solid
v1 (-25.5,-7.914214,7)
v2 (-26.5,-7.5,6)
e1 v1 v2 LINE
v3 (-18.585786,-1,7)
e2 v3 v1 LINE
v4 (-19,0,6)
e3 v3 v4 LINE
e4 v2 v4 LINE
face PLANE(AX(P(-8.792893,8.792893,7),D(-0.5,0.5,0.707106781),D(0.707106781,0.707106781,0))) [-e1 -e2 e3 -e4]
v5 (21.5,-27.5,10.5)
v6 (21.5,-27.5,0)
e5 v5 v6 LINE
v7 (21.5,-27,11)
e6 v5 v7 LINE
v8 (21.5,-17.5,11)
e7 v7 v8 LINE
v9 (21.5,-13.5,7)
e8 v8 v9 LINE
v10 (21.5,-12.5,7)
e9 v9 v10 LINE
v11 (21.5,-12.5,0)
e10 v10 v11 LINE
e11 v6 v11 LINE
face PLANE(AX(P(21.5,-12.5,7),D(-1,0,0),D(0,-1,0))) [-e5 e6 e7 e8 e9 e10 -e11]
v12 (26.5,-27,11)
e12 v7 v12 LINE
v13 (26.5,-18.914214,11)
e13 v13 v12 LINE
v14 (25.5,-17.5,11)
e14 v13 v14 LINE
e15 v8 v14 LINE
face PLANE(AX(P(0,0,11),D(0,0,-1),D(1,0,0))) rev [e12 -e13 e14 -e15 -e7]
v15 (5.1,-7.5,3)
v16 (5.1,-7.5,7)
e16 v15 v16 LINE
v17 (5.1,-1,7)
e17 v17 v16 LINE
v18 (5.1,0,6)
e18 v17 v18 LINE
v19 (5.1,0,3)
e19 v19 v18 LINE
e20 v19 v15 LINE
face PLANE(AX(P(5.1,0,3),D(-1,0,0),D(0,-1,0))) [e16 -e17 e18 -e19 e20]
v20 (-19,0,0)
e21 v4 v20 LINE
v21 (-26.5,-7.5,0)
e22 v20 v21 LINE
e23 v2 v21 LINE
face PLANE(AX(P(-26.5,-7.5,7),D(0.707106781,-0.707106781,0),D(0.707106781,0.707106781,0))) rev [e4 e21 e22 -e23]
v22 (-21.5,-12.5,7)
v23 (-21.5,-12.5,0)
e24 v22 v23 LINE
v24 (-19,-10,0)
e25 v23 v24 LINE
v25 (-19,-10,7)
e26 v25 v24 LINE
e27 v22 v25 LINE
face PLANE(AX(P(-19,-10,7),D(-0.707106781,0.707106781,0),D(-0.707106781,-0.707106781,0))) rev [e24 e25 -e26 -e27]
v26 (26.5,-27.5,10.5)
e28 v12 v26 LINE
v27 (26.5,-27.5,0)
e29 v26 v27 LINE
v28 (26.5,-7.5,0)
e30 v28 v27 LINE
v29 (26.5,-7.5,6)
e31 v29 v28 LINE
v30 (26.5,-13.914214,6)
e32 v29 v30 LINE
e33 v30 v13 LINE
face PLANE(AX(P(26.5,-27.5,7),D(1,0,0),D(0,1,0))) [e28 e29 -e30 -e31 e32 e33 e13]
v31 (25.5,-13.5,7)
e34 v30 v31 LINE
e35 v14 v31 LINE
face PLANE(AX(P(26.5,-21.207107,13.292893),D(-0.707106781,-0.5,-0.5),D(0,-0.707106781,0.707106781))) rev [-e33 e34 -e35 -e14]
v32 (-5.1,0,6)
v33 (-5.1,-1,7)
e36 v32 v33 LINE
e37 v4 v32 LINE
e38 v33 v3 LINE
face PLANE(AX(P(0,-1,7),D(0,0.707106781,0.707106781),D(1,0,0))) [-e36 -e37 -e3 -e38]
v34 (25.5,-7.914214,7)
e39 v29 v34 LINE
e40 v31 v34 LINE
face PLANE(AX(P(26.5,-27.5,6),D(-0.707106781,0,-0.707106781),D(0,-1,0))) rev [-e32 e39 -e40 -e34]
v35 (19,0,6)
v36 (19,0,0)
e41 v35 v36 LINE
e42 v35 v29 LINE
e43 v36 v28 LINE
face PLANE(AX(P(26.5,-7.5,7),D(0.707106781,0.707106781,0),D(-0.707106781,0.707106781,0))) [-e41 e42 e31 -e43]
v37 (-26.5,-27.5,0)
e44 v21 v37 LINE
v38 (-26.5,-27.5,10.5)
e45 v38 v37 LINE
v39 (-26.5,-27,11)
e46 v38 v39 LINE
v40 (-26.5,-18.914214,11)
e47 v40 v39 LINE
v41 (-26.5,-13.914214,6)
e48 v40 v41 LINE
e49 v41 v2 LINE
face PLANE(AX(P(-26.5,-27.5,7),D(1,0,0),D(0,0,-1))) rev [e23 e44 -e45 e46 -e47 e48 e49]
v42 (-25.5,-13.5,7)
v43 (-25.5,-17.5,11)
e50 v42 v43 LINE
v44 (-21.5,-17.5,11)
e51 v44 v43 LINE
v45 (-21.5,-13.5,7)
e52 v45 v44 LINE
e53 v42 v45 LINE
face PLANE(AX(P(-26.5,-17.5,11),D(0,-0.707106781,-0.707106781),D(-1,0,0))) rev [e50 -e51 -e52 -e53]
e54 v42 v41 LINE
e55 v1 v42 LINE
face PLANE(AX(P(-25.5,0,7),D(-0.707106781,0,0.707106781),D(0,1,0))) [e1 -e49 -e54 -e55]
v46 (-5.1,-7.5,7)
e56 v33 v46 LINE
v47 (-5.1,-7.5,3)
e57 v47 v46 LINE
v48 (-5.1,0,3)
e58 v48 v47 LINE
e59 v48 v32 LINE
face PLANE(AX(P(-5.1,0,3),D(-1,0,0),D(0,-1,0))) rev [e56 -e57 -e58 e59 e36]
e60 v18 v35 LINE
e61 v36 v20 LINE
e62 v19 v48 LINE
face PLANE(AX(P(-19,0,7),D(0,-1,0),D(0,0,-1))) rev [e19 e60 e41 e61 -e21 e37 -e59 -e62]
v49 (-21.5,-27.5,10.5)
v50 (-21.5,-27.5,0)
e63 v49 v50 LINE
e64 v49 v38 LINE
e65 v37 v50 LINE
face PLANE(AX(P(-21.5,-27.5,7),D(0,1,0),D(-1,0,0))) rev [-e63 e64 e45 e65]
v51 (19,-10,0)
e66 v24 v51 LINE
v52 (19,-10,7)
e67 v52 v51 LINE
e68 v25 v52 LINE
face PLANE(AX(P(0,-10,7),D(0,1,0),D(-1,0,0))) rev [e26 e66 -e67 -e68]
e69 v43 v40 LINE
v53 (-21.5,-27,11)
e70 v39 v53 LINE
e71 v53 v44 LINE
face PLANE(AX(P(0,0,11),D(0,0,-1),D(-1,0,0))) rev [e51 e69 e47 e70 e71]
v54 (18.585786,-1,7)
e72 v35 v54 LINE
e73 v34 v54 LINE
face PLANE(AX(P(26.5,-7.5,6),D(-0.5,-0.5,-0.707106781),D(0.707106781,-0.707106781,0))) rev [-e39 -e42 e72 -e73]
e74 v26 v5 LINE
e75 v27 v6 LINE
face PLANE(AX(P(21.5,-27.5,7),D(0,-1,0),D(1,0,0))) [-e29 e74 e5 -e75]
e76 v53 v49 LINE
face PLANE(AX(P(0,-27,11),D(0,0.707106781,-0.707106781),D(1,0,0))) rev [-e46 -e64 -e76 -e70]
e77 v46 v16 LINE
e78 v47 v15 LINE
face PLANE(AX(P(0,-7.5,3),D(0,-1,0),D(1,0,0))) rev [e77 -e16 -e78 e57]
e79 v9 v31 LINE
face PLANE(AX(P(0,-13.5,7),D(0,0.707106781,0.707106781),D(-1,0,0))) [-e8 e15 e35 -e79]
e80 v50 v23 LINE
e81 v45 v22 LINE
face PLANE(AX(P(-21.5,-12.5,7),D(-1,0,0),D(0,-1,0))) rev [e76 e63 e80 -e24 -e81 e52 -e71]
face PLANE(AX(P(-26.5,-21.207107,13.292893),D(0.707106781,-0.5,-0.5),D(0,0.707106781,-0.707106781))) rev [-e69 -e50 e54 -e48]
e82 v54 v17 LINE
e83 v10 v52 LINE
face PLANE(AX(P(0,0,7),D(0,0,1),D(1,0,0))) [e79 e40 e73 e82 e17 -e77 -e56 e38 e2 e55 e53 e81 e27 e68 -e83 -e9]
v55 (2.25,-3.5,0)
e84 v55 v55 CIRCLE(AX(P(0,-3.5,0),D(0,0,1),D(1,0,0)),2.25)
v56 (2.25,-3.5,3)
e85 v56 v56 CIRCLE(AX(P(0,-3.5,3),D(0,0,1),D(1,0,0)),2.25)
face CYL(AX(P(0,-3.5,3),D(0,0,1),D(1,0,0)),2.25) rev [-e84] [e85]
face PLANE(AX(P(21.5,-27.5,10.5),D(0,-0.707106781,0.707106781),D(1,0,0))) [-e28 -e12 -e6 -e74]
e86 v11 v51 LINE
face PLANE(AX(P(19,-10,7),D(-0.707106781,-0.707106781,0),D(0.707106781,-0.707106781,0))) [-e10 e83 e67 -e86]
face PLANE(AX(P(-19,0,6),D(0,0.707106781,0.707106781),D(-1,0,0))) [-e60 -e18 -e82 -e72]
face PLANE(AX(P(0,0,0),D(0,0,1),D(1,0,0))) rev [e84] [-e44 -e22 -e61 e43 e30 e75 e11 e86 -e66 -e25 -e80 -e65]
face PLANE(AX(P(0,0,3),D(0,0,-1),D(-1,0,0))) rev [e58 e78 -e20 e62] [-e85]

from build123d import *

# Parameters (mm, degrees)
BOSS_EXTRUDE1_DEPTH  = 7
SKETCH6_W            = 5
SKETCH6_H            = 10
BOSS_EXTRUDE2_DEPTH  = 4
SKETCH3_W            = 5.1
SKETCH3_H            = 7.5
CUT_EXTRUDE1_DEPTH   = 4
M4_CLEARANCE_HOLE1_D = 4.5
CHAMFER2_SIZE        = 4
CHAMFER5_SIZE        = 0.5


# Some blends are built 0.0001 mm under size
with BuildPart() as part:
    # Sketch1 → Boss-Extrude1 (new body)
    with BuildSketch(Plane.XY):
        Polygon((0, 0), (0, -10), (-19, -10), (-21.5, -12.5), (-21.5, -27.5), (-26.5, -27.5), (-26.5, -7.5), (-19, 0), align=None)
    boss_extrude1 = extrude(amount=BOSS_EXTRUDE1_DEPTH)

    # Sketch6 → Boss-Extrude2 (add)
    with BuildSketch(Plane.XY.offset(7)):
        with Locations((-24, -22.5)):
            Rectangle(SKETCH6_W, SKETCH6_H)
    boss_extrude2 = extrude(amount=BOSS_EXTRUDE2_DEPTH)

    # Sketch3 → Cut-Extrude1 (cut)
    with BuildSketch(Plane.XY.offset(7)):
        with Locations((-2.55, -3.75)):
            Rectangle(SKETCH3_W, SKETCH3_H)
    cut_extrude1 = extrude(amount=-CUT_EXTRUDE1_DEPTH, mode=Mode.SUBTRACT)

    # Mirror1: Boss-Extrude1, Boss-Extrude2, Cut-Extrude1 across plane
    add(boss_extrude1.mirror(Plane(origin=(0, 0, 7), x_dir=(0, 0, 1), z_dir=(-1, 0, 0))))
    add(boss_extrude2.mirror(Plane(origin=(0, 0, 7), x_dir=(0, 0, 1), z_dir=(-1, 0, 0))))
    add(cut_extrude1.mirror(Plane(origin=(0, 0, 7), x_dir=(0, 0, 1), z_dir=(-1, 0, 0))), mode=Mode.SUBTRACT)

    # M4 Clearance Hole1 (through all)
    with Locations(Plane.XY.offset(3)):
        with Locations((0, -3.5)):
            Hole(M4_CLEARANCE_HOLE1_D / 2)

    # Chamfer2
    chamfer2_edges = [part.edges().sort_by_distance(p)[0] for p in [
        (-24, -17.5, 7),
        (24, -17.5, 7),
    ]]
    chamfer(chamfer2_edges, length=CHAMFER2_SIZE - 0.0001)  # a hair under: the kernel refuses the full size

    # Chamfer4
    # the kernel refuses this chamfer: 1 mm, written as the material it takes off along each edge
    with BuildSketch(Plane(origin=(26.5, -11.68164552, 5.18154552), x_dir=(-0.9996219169112968, 0.019442520806014118, 0.01944252080601436), z_dir=(0, -0.7071067811865476, 0.7071067811865476))) as chamfer4_piece_1_section:
        with BuildLine():
            Line((1.028673195, 0), (-0.056547155, 1.027117794))
            Line((-0.056547155, 1.027117794), (-0.076539593, 1.026567876))
            ThreePointArc((-0.076539593, 1.026567876), (-0.034129227, 0.51339783), (-0.019992438, -0.000549918))
            Line((-0.019992438, -0.000549918), (0.000549918, -0.019992438))
            ThreePointArc((0.000549918, -0.019992438), (0.514497665, -0.00585565), (1.029223113, -0.019992438))
            Line((1.029223113, -0.019992438), (1.028673195, 0))
        make_face()
    chamfer4_piece_1 = extrude(amount=10.800078804, mode=Mode.PRIVATE)
    chamfer4_piece_1 = split(chamfer4_piece_1, bisect_by=Plane(origin=(26.156619069, -15.715277747, 7), z_dir=(0, 0, 1)), keep=Keep.TOP, mode=Mode.PRIVATE)
    add(chamfer4_piece_1, mode=Mode.SUBTRACT)
    with BuildSketch(Plane(origin=(-26.5, -11.68164552, 5.18154552), x_dir=(0.9996219169112968, 0.019442520806013806, 0.019442520806013806), z_dir=(0, -0.7071067811865476, 0.7071067811865476))) as chamfer4_piece_2_section:
        with BuildLine():
            Line((1.028673195, 0), (-0.056547155, -1.027117794))
            Line((-0.056547155, -1.027117794), (-0.076539593, -1.026567876))
            ThreePointArc((-0.076539593, -1.026567876), (-0.034129227, -0.51339783), (-0.019992438, 0.000549918))
            Line((-0.019992438, 0.000549918), (0.000549918, 0.019992438))
            ThreePointArc((0.000549918, 0.019992438), (0.514497665, 0.00585565), (1.029223113, 0.019992438))
            Line((1.029223113, 0.019992438), (1.028673195, 0))
        make_face()
    chamfer4_piece_2 = extrude(amount=10.800078804, mode=Mode.PRIVATE)
    chamfer4_piece_2 = split(chamfer4_piece_2, bisect_by=Plane(origin=(-26.156619069, -15.715277747, 7), z_dir=(0, 0, 1)), keep=Keep.TOP, mode=Mode.PRIVATE)
    add(chamfer4_piece_2, mode=Mode.SUBTRACT)
    with BuildSketch(Plane(origin=(-28.31845448, -9.31845448, 7), x_dir=(0.7068394360706726, -0.7068394360706746, 0.027495876610586528), z_dir=(0.7071067811865485, 0.7071067811865466, 0))) as chamfer4_piece_3:
        with BuildLine():
            Line((1.028673195, 0), (-0.056547155, 1.027117794))
            Line((-0.056547155, 1.027117794), (-0.076539593, 1.026567876))
            ThreePointArc((-0.076539593, 1.026567876), (-0.034129227, 0.51339783), (-0.019992438, -0.000549918))
            Line((-0.019992438, -0.000549918), (0.000549918, -0.019992438))
            ThreePointArc((0.000549918, -0.019992438), (0.514497665, -0.00585565), (1.029223113, -0.019992438))
            Line((1.029223113, -0.019992438), (1.028673195, 0))
        make_face()
    extrude(amount=15.749967694, mode=Mode.SUBTRACT)
    with BuildSketch(Plane(origin=(-26.5, -16.071782988, 7), x_dir=(0.9996219169112968, 0, 0.02749587661058651), z_dir=(0, 1, 0))) as chamfer4_piece_4_section:
        with BuildLine():
            Line((1.028673195, 0), (-0.056547155, 1.027117794))
            Line((-0.056547155, 1.027117794), (-0.076539593, 1.026567876))
            ThreePointArc((-0.076539593, 1.026567876), (-0.034129227, 0.51339783), (-0.019992438, -0.000549918))
            Line((-0.019992438, -0.000549918), (0.000549918, -0.019992438))
            ThreePointArc((0.000549918, -0.019992438), (0.514497665, -0.00585565), (1.029223113, -0.019992438))
            Line((1.029223113, -0.019992438), (1.028673195, 0))
        make_face()
    chamfer4_piece_4 = extrude(amount=11.143465976, mode=Mode.PRIVATE)
    chamfer4_piece_4 = split(chamfer4_piece_4, bisect_by=Plane(origin=(-26.166087376, -11.115587602, 4.615487602), z_dir=(0, 0.7071067811865476, 0.7071067811865476)), keep=Keep.TOP, mode=Mode.PRIVATE)
    add(chamfer4_piece_4, mode=Mode.SUBTRACT)
    with BuildSketch(Plane(origin=(-21.571682988, 0, 7), x_dir=(0, -0.9996219169112968, 0.027495876610586494), z_dir=(1, 0, 0))) as chamfer4_piece_5:
        with BuildLine():
            Line((1.028673195, 0), (-0.056547155, 1.027117794))
            Line((-0.056547155, 1.027117794), (-0.076539593, 1.026567876))
            ThreePointArc((-0.076539593, 1.026567876), (-0.034129227, 0.51339783), (-0.019992438, -0.000549918))
            Line((-0.019992438, -0.000549918), (0.000549918, -0.019992438))
            ThreePointArc((0.000549918, -0.019992438), (0.514497665, -0.00585565), (1.029223113, -0.019992438))
            Line((1.029223113, -0.019992438), (1.028673195, 0))
        make_face()
    extrude(amount=19.043365976, mode=Mode.SUBTRACT)
    with BuildSketch(Plane(origin=(26.5, -16.071782988, 7), x_dir=(-0.9996219169112968, 0, 0.02749587661058651), z_dir=(0, 1, 0))) as chamfer4_piece_6_section:
        with BuildLine():
            Line((1.028673195, 0), (-0.056547155, -1.027117794))
            Line((-0.056547155, -1.027117794), (-0.076539593, -1.026567876))
            ThreePointArc((-0.076539593, -1.026567876), (-0.034129227, -0.51339783), (-0.019992438, 0.000549918))
            Line((-0.019992438, 0.000549918), (0.000549918, 0.019992438))
            ThreePointArc((0.000549918, 0.019992438), (0.514497665, 0.00585565), (1.029223113, 0.019992438))
            Line((1.029223113, 0.019992438), (1.028673195, 0))
        make_face()
    chamfer4_piece_6 = extrude(amount=11.143465976, mode=Mode.PRIVATE)
    chamfer4_piece_6 = split(chamfer4_piece_6, bisect_by=Plane(origin=(26.166087376, -11.115587602, 4.615487602), z_dir=(0, 0.7071067811865476, 0.7071067811865476)), keep=Keep.TOP, mode=Mode.PRIVATE)
    add(chamfer4_piece_6, mode=Mode.SUBTRACT)
    with BuildSketch(Plane(origin=(28.31845448, -9.31845448, 7), x_dir=(-0.7068394360706725, -0.7068394360706747, 0.027495876610586528), z_dir=(-0.7071067811865487, 0.7071067811865464, 0))) as chamfer4_piece_7:
        with BuildLine():
            Line((1.028673195, 0), (-0.056547155, -1.027117794))
            Line((-0.056547155, -1.027117794), (-0.076539593, -1.026567876))
            ThreePointArc((-0.076539593, -1.026567876), (-0.034129227, -0.51339783), (-0.019992438, 0.000549918))
            Line((-0.019992438, 0.000549918), (0.000549918, 0.019992438))
            ThreePointArc((0.000549918, 0.019992438), (0.514497665, 0.00585565), (1.029223113, 0.019992438))
            Line((1.029223113, 0.019992438), (1.028673195, 0))
        make_face()
    extrude(amount=15.749967694, mode=Mode.SUBTRACT)
    with BuildSketch(Plane(origin=(21.571682988, 0, 7), x_dir=(0, -0.9996219169112968, 0.027495876610586494), z_dir=(-1, 0, 0))) as chamfer4_piece_8:
        with BuildLine():
            Line((1.028673195, 0), (-0.056547155, -1.027117794))
            Line((-0.056547155, -1.027117794), (-0.076539593, -1.026567876))
            ThreePointArc((-0.076539593, -1.026567876), (-0.034129227, -0.51339783), (-0.019992438, 0.000549918))
            Line((-0.019992438, 0.000549918), (0.000549918, 0.019992438))
            ThreePointArc((0.000549918, 0.019992438), (0.514497665, 0.00585565), (1.029223113, 0.019992438))
            Line((1.029223113, 0.019992438), (1.028673195, 0))
        make_face()
    extrude(amount=19.043365976, mode=Mode.SUBTRACT)
    with BuildSketch(Plane(origin=(26.5, -16.071782988, 7), x_dir=(-0.9996219169112968, 0, 0.02749587661058651), z_dir=(0, 1, 0))) as chamfer4_piece_9a_section:
        with BuildLine():
            Line((1.028673195, 0), (-0.056547155, -1.027117794))
            Line((-0.056547155, -1.027117794), (-0.076539593, -1.026567876))
            ThreePointArc((-0.076539593, -1.026567876), (-0.034129227, -0.51339783), (-0.019992438, 0.000549918))
            Line((-0.019992438, 0.000549918), (0.000549918, 0.019992438))
            ThreePointArc((0.000549918, 0.019992438), (0.514497665, 0.00585565), (1.029223113, 0.019992438))
            Line((1.029223113, 0.019992438), (1.028673195, 0))
        make_face()
    chamfer4_piece_9a = extrude(amount=11.143465976, mode=Mode.PRIVATE)
    chamfer4_piece_9a = split(chamfer4_piece_9a, bisect_by=Plane(origin=(26.181906875, -13.879260813, 7.379160813), z_dir=(0, -0.7071067811865476, -0.7071067811865476)), keep=Keep.TOP, mode=Mode.PRIVATE)
    with BuildSketch(Plane(origin=(26.5, -11.68164552, 5.18154552), x_dir=(-0.9996219169112968, 0.019442520806014118, 0.01944252080601436), z_dir=(0, -0.7071067811865476, 0.7071067811865476))) as chamfer4_piece_9b_section:
        with BuildLine():
            Line((1.028673195, 0), (-0.056547155, 1.027117794))
            Line((-0.056547155, 1.027117794), (-0.076539593, 1.026567876))
            ThreePointArc((-0.076539593, 1.026567876), (-0.034129227, 0.51339783), (-0.019992438, -0.000549918))
            Line((-0.019992438, -0.000549918), (0.000549918, -0.019992438))
            ThreePointArc((0.000549918, -0.019992438), (0.514497665, -0.00585565), (1.029223113, -0.019992438))
            Line((1.029223113, -0.019992438), (1.028673195, 0))
        make_face()
    chamfer4_piece_9b = extrude(amount=10.800078804, mode=Mode.PRIVATE)
    chamfer4_piece_9b = split(chamfer4_piece_9b, bisect_by=Plane(origin=(26.181906875, -12.963885635, 7), z_dir=(0, 0, -1)), keep=Keep.TOP, mode=Mode.PRIVATE)
    chamfer4_piece_9 = chamfer4_piece_9a & chamfer4_piece_9b
    add(chamfer4_piece_9, mode=Mode.SUBTRACT)
    with BuildSketch(Plane(origin=(-26.5, -16.071782988, 7), x_dir=(0.9996219169112968, 0, 0.02749587661058651), z_dir=(0, 1, 0))) as chamfer4_piece_10a_section:
        with BuildLine():
            Line((1.028673195, 0), (-0.056547155, 1.027117794))
            Line((-0.056547155, 1.027117794), (-0.076539593, 1.026567876))
            ThreePointArc((-0.076539593, 1.026567876), (-0.034129227, 0.51339783), (-0.019992438, -0.000549918))
            Line((-0.019992438, -0.000549918), (0.000549918, -0.019992438))
            ThreePointArc((0.000549918, -0.019992438), (0.514497665, -0.00585565), (1.029223113, -0.019992438))
            Line((1.029223113, -0.019992438), (1.028673195, 0))
        make_face()
    chamfer4_piece_10a = extrude(amount=11.143465976, mode=Mode.PRIVATE)
    chamfer4_piece_10a = split(chamfer4_piece_10a, bisect_by=Plane(origin=(-26.181906875, -13.879260813, 7.379160813), z_dir=(0, -0.7071067811865476, -0.7071067811865476)), keep=Keep.TOP, mode=Mode.PRIVATE)
    with BuildSketch(Plane(origin=(-26.5, -11.68164552, 5.18154552), x_dir=(0.9996219169112968, 0.019442520806013806, 0.019442520806013806), z_dir=(0, -0.7071067811865476, 0.7071067811865476))) as chamfer4_piece_10b_section:
        with BuildLine():
            Line((1.028673195, 0), (-0.056547155, -1.027117794))
            Line((-0.056547155, -1.027117794), (-0.076539593, -1.026567876))
            ThreePointArc((-0.076539593, -1.026567876), (-0.034129227, -0.51339783), (-0.019992438, 0.000549918))
            Line((-0.019992438, 0.000549918), (0.000549918, 0.019992438))
            ThreePointArc((0.000549918, 0.019992438), (0.514497665, 0.00585565), (1.029223113, 0.019992438))
            Line((1.029223113, 0.019992438), (1.028673195, 0))
        make_face()
    chamfer4_piece_10b = extrude(amount=10.800078804, mode=Mode.PRIVATE)
    chamfer4_piece_10b = split(chamfer4_piece_10b, bisect_by=Plane(origin=(-26.181906875, -12.963885635, 7), z_dir=(0, 0, -1)), keep=Keep.TOP, mode=Mode.PRIVATE)
    chamfer4_piece_10 = chamfer4_piece_10a & chamfer4_piece_10b
    add(chamfer4_piece_10, mode=Mode.SUBTRACT)

    # Chamfer5
    chamfer5_edges = [part.edges().sort_by_distance(p)[0] for p in [
        (-24, -27.5, 11),
        (24, -27.5, 11),
    ]]
    chamfer(chamfer5_edges, length=CHAMFER5_SIZE)


solid = part.part
